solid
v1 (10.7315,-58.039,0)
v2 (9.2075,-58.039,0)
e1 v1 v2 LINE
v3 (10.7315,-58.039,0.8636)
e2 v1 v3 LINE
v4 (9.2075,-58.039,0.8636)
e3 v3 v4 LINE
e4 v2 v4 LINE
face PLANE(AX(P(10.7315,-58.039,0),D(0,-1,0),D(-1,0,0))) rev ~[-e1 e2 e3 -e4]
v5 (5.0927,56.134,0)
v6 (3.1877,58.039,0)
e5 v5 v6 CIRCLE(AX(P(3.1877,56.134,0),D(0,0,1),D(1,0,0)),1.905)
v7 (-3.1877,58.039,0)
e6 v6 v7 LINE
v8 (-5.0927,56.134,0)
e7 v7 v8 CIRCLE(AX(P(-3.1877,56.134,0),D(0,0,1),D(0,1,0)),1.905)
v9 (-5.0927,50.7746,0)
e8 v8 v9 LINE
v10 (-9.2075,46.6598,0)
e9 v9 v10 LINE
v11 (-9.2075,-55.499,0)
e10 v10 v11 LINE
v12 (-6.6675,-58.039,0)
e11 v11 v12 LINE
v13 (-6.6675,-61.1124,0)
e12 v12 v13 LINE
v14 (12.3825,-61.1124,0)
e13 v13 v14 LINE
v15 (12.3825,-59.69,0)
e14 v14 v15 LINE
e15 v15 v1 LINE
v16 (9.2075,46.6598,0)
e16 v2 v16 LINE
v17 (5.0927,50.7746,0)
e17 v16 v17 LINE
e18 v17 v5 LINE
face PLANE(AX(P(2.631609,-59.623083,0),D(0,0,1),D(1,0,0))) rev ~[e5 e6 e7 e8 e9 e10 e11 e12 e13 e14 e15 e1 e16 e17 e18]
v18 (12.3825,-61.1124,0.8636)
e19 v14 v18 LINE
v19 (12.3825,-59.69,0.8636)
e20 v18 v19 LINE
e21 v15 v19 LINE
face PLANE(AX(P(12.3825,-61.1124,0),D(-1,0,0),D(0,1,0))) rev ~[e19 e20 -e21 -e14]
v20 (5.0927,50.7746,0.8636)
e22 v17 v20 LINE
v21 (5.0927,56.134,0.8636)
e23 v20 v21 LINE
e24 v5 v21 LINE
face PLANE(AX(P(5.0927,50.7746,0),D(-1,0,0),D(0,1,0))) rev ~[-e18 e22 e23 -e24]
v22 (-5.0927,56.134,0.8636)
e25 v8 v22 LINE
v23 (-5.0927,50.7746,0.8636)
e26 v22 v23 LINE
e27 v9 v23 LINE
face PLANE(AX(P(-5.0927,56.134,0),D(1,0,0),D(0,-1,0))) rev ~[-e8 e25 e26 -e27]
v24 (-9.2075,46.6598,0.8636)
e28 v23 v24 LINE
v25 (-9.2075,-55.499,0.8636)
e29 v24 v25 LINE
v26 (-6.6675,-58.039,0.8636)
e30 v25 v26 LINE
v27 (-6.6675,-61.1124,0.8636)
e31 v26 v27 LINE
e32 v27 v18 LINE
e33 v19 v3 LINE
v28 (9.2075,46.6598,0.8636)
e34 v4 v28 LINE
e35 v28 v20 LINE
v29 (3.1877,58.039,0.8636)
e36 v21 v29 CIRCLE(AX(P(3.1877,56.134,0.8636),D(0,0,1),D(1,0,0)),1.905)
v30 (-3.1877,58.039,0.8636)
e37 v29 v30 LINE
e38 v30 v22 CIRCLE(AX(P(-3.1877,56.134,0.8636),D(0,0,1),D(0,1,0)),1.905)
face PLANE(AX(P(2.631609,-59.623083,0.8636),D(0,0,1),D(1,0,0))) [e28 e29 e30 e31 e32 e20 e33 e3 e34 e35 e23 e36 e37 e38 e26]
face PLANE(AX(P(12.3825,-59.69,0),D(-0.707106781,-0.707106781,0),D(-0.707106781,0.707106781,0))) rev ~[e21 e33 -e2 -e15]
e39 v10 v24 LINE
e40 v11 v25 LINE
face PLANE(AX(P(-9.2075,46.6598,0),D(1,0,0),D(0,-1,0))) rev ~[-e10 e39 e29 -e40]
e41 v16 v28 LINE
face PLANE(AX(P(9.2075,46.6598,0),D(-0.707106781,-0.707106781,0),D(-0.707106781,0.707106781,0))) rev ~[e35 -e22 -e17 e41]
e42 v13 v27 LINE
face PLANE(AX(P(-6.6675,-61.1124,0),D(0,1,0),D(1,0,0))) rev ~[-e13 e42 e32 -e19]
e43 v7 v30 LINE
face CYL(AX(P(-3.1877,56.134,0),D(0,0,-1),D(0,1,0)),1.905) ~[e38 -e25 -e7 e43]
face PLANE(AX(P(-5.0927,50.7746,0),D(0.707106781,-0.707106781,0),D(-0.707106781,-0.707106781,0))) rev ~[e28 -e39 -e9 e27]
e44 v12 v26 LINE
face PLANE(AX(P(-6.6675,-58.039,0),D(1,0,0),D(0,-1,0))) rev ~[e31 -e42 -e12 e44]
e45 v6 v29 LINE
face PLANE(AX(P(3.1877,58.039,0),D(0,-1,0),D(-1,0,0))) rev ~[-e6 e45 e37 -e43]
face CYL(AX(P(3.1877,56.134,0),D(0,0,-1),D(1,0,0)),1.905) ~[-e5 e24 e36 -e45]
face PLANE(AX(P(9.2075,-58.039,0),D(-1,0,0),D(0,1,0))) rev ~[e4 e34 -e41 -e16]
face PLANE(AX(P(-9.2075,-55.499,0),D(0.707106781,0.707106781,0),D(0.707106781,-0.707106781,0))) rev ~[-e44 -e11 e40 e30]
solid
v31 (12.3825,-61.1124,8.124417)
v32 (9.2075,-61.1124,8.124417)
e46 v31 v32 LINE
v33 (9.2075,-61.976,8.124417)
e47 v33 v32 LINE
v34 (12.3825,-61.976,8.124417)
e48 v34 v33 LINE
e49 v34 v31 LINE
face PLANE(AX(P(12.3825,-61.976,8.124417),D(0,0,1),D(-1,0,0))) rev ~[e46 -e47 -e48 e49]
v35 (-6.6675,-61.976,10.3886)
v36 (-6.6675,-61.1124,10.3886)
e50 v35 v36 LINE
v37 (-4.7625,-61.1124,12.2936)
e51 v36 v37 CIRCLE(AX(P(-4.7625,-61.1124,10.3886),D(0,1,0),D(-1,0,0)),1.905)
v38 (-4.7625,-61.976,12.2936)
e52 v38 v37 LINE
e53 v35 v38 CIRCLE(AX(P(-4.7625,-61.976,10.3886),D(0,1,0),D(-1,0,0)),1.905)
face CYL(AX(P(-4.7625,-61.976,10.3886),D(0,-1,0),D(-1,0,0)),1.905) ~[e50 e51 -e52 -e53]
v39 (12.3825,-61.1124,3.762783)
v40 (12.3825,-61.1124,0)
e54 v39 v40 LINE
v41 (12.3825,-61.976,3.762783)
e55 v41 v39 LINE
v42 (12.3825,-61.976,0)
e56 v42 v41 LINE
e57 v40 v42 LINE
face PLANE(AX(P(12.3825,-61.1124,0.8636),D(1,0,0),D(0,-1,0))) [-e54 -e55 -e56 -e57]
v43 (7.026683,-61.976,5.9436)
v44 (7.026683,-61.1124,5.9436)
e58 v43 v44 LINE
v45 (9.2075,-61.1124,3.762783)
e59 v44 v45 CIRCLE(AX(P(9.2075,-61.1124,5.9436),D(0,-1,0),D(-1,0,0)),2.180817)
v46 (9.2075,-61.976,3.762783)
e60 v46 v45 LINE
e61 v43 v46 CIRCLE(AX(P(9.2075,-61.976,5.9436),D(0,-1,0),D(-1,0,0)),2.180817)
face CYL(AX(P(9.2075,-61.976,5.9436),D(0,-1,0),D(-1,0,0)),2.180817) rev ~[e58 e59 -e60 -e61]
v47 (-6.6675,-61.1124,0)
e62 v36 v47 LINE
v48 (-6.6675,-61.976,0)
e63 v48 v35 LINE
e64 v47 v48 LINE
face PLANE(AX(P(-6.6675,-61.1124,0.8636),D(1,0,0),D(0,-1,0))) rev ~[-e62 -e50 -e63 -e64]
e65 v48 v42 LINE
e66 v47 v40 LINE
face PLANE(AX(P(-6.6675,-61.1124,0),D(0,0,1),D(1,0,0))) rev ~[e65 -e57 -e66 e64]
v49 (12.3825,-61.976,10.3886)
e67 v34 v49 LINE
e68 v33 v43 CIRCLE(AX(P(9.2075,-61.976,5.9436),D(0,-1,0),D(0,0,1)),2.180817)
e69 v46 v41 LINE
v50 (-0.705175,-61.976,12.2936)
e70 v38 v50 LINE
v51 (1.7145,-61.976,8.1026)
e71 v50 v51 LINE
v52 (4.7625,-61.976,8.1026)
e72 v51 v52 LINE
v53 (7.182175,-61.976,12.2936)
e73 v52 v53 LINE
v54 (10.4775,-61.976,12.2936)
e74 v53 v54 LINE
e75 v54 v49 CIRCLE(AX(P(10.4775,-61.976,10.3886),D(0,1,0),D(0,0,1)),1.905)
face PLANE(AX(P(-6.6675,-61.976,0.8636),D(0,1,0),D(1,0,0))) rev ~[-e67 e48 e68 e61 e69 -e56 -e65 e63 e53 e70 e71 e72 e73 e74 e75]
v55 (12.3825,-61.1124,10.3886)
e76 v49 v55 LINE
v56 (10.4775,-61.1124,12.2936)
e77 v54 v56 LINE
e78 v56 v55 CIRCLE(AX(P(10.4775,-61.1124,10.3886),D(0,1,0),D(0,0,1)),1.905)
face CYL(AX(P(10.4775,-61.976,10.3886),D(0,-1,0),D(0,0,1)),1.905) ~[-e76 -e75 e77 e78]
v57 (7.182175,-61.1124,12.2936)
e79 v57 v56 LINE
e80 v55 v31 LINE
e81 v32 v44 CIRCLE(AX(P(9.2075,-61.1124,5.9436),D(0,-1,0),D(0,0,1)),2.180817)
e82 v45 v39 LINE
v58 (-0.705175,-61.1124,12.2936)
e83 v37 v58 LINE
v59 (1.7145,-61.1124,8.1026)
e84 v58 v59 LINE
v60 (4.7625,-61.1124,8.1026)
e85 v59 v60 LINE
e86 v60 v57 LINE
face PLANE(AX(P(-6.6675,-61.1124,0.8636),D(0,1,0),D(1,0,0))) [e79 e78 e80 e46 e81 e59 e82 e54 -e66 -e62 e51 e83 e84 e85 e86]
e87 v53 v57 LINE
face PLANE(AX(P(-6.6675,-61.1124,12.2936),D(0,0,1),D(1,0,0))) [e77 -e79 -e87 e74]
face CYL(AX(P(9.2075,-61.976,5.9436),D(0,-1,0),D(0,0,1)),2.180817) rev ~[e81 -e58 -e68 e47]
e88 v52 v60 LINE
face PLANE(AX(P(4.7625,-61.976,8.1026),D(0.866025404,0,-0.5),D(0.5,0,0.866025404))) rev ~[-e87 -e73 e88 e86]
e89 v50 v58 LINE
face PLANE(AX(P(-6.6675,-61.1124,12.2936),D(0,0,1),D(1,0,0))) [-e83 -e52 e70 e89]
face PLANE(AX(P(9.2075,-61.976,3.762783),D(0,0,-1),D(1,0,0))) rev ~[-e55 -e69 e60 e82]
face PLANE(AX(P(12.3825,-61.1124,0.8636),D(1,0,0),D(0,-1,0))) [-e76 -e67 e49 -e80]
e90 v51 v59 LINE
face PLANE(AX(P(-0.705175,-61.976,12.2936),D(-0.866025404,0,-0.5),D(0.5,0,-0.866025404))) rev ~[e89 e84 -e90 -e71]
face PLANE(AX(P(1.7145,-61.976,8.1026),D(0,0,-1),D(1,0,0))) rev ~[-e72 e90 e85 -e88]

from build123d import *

# Parameters (mm, degrees)
F1_DEPTH = 0.8636
F2_DEPTH = 0.8636
F3_DEPTH = 11.43
F4_W     = 3.048
F4_H     = 4.191
F5_DEPTH = 0.8636


# Not quite as in the source:
# - a feature names something its author has since deleted; it is built from what else it names


with BuildPart() as f1:
    # F0 (on Top) → F1 (new body)
    with BuildSketch(Plane.XY):
        Polygon((10.7315, -58.039), (9.2075, -58.039), (-6.6675, -58.039), (-6.6675, -61.1124), (12.3825, -61.1124), (12.3825, -59.69), align=None)
        with BuildLine():
            ThreePointArc((5.0927, 56.134), (4.5347384182, 57.4810384182), (3.1877, 58.039))
            Line((3.1877, 58.039), (0, 58.039))
            Line((0, 58.039), (-3.1877, 58.039))
            ThreePointArc((-3.1877, 58.039), (-4.5347384182, 57.4810384182), (-5.0927, 56.134))
            Line((-5.0927, 56.134), (-5.0927, 50.7746))
            Line((-5.0927, 50.7746), (-9.2075, 46.6598))
            Line((-9.2075, 46.6598), (-9.2075, -55.499))
            Line((-9.2075, -55.499), (-6.6675, -58.039))
            Line((-6.6675, -58.039), (9.2075, -58.039))
            Line((9.2075, -58.039), (9.2075, 46.6598))
            Line((9.2075, 46.6598), (5.0927, 50.7746))
            Line((5.0927, 50.7746), (5.0927, 56.134))
        make_face()
    extrude(amount=F1_DEPTH)


with BuildPart() as f2:
    # F2 (new): a face of the model
    f2_faces = [f1.part.faces().sort_by_distance(p)[0] for p in [
        (2.8575, -61.1124, 0.4318),
    ]]
    extrude(f2_faces, amount=F2_DEPTH)

    # F3 (add): a face of the model
    f3_faces = [f2.faces().sort_by_distance(p)[0] for p in [
        (2.8575, -61.5442, 0.8636),
    ]]
    extrude(f3_faces, amount=F3_DEPTH)

    # F4 (on face) → F5 (cut)
    with BuildSketch(Plane.XZ.offset(61.976)):
        with BuildLine():
            Line((12.3825, 3.7627826078), (12.3825, 8.1244173922))
            Line((12.3825, 8.1244173922), (9.2075, 8.1244173922))
            ThreePointArc((9.2075, 8.1244173922), (7.6654292335, 7.4856707665), (7.0266826078, 5.9436))
            ThreePointArc((7.0266826078, 5.9436), (7.6654292335, 4.4015292335), (9.2075, 3.7627826078))
            Line((9.2075, 3.7627826078), (12.3825, 3.7627826078))
        make_face()
        Polygon((1.7145, 8.1026), (1.7145, 12.2936), (-0.7051749782, 12.2936), align=None)
        with Locations((3.2385, 10.1981)):
            Rectangle(F4_W, F4_H)
        Polygon((7.1821749782, 12.2936), (4.7625, 12.2936), (4.7625, 8.1026), align=None)
        with BuildLine():
            Line((12.3825, 12.2936), (10.4775, 12.2936))
            ThreePointArc((10.4775, 12.2936), (11.8245384182, 11.7356384182), (12.3825, 10.3886))
            Line((12.3825, 10.3886), (12.3825, 12.2936))
        make_face()
        with BuildLine():
            ThreePointArc((-6.6675, 10.3886), (-6.1095384182, 11.7356384182), (-4.7625, 12.2936))
            Line((-4.7625, 12.2936), (-6.6675, 12.2936))
            Line((-6.6675, 12.2936), (-6.6675, 10.3886))
        make_face()
    extrude(amount=-F5_DEPTH, mode=Mode.SUBTRACT)


solid = Compound([f1.part, f2.part])
